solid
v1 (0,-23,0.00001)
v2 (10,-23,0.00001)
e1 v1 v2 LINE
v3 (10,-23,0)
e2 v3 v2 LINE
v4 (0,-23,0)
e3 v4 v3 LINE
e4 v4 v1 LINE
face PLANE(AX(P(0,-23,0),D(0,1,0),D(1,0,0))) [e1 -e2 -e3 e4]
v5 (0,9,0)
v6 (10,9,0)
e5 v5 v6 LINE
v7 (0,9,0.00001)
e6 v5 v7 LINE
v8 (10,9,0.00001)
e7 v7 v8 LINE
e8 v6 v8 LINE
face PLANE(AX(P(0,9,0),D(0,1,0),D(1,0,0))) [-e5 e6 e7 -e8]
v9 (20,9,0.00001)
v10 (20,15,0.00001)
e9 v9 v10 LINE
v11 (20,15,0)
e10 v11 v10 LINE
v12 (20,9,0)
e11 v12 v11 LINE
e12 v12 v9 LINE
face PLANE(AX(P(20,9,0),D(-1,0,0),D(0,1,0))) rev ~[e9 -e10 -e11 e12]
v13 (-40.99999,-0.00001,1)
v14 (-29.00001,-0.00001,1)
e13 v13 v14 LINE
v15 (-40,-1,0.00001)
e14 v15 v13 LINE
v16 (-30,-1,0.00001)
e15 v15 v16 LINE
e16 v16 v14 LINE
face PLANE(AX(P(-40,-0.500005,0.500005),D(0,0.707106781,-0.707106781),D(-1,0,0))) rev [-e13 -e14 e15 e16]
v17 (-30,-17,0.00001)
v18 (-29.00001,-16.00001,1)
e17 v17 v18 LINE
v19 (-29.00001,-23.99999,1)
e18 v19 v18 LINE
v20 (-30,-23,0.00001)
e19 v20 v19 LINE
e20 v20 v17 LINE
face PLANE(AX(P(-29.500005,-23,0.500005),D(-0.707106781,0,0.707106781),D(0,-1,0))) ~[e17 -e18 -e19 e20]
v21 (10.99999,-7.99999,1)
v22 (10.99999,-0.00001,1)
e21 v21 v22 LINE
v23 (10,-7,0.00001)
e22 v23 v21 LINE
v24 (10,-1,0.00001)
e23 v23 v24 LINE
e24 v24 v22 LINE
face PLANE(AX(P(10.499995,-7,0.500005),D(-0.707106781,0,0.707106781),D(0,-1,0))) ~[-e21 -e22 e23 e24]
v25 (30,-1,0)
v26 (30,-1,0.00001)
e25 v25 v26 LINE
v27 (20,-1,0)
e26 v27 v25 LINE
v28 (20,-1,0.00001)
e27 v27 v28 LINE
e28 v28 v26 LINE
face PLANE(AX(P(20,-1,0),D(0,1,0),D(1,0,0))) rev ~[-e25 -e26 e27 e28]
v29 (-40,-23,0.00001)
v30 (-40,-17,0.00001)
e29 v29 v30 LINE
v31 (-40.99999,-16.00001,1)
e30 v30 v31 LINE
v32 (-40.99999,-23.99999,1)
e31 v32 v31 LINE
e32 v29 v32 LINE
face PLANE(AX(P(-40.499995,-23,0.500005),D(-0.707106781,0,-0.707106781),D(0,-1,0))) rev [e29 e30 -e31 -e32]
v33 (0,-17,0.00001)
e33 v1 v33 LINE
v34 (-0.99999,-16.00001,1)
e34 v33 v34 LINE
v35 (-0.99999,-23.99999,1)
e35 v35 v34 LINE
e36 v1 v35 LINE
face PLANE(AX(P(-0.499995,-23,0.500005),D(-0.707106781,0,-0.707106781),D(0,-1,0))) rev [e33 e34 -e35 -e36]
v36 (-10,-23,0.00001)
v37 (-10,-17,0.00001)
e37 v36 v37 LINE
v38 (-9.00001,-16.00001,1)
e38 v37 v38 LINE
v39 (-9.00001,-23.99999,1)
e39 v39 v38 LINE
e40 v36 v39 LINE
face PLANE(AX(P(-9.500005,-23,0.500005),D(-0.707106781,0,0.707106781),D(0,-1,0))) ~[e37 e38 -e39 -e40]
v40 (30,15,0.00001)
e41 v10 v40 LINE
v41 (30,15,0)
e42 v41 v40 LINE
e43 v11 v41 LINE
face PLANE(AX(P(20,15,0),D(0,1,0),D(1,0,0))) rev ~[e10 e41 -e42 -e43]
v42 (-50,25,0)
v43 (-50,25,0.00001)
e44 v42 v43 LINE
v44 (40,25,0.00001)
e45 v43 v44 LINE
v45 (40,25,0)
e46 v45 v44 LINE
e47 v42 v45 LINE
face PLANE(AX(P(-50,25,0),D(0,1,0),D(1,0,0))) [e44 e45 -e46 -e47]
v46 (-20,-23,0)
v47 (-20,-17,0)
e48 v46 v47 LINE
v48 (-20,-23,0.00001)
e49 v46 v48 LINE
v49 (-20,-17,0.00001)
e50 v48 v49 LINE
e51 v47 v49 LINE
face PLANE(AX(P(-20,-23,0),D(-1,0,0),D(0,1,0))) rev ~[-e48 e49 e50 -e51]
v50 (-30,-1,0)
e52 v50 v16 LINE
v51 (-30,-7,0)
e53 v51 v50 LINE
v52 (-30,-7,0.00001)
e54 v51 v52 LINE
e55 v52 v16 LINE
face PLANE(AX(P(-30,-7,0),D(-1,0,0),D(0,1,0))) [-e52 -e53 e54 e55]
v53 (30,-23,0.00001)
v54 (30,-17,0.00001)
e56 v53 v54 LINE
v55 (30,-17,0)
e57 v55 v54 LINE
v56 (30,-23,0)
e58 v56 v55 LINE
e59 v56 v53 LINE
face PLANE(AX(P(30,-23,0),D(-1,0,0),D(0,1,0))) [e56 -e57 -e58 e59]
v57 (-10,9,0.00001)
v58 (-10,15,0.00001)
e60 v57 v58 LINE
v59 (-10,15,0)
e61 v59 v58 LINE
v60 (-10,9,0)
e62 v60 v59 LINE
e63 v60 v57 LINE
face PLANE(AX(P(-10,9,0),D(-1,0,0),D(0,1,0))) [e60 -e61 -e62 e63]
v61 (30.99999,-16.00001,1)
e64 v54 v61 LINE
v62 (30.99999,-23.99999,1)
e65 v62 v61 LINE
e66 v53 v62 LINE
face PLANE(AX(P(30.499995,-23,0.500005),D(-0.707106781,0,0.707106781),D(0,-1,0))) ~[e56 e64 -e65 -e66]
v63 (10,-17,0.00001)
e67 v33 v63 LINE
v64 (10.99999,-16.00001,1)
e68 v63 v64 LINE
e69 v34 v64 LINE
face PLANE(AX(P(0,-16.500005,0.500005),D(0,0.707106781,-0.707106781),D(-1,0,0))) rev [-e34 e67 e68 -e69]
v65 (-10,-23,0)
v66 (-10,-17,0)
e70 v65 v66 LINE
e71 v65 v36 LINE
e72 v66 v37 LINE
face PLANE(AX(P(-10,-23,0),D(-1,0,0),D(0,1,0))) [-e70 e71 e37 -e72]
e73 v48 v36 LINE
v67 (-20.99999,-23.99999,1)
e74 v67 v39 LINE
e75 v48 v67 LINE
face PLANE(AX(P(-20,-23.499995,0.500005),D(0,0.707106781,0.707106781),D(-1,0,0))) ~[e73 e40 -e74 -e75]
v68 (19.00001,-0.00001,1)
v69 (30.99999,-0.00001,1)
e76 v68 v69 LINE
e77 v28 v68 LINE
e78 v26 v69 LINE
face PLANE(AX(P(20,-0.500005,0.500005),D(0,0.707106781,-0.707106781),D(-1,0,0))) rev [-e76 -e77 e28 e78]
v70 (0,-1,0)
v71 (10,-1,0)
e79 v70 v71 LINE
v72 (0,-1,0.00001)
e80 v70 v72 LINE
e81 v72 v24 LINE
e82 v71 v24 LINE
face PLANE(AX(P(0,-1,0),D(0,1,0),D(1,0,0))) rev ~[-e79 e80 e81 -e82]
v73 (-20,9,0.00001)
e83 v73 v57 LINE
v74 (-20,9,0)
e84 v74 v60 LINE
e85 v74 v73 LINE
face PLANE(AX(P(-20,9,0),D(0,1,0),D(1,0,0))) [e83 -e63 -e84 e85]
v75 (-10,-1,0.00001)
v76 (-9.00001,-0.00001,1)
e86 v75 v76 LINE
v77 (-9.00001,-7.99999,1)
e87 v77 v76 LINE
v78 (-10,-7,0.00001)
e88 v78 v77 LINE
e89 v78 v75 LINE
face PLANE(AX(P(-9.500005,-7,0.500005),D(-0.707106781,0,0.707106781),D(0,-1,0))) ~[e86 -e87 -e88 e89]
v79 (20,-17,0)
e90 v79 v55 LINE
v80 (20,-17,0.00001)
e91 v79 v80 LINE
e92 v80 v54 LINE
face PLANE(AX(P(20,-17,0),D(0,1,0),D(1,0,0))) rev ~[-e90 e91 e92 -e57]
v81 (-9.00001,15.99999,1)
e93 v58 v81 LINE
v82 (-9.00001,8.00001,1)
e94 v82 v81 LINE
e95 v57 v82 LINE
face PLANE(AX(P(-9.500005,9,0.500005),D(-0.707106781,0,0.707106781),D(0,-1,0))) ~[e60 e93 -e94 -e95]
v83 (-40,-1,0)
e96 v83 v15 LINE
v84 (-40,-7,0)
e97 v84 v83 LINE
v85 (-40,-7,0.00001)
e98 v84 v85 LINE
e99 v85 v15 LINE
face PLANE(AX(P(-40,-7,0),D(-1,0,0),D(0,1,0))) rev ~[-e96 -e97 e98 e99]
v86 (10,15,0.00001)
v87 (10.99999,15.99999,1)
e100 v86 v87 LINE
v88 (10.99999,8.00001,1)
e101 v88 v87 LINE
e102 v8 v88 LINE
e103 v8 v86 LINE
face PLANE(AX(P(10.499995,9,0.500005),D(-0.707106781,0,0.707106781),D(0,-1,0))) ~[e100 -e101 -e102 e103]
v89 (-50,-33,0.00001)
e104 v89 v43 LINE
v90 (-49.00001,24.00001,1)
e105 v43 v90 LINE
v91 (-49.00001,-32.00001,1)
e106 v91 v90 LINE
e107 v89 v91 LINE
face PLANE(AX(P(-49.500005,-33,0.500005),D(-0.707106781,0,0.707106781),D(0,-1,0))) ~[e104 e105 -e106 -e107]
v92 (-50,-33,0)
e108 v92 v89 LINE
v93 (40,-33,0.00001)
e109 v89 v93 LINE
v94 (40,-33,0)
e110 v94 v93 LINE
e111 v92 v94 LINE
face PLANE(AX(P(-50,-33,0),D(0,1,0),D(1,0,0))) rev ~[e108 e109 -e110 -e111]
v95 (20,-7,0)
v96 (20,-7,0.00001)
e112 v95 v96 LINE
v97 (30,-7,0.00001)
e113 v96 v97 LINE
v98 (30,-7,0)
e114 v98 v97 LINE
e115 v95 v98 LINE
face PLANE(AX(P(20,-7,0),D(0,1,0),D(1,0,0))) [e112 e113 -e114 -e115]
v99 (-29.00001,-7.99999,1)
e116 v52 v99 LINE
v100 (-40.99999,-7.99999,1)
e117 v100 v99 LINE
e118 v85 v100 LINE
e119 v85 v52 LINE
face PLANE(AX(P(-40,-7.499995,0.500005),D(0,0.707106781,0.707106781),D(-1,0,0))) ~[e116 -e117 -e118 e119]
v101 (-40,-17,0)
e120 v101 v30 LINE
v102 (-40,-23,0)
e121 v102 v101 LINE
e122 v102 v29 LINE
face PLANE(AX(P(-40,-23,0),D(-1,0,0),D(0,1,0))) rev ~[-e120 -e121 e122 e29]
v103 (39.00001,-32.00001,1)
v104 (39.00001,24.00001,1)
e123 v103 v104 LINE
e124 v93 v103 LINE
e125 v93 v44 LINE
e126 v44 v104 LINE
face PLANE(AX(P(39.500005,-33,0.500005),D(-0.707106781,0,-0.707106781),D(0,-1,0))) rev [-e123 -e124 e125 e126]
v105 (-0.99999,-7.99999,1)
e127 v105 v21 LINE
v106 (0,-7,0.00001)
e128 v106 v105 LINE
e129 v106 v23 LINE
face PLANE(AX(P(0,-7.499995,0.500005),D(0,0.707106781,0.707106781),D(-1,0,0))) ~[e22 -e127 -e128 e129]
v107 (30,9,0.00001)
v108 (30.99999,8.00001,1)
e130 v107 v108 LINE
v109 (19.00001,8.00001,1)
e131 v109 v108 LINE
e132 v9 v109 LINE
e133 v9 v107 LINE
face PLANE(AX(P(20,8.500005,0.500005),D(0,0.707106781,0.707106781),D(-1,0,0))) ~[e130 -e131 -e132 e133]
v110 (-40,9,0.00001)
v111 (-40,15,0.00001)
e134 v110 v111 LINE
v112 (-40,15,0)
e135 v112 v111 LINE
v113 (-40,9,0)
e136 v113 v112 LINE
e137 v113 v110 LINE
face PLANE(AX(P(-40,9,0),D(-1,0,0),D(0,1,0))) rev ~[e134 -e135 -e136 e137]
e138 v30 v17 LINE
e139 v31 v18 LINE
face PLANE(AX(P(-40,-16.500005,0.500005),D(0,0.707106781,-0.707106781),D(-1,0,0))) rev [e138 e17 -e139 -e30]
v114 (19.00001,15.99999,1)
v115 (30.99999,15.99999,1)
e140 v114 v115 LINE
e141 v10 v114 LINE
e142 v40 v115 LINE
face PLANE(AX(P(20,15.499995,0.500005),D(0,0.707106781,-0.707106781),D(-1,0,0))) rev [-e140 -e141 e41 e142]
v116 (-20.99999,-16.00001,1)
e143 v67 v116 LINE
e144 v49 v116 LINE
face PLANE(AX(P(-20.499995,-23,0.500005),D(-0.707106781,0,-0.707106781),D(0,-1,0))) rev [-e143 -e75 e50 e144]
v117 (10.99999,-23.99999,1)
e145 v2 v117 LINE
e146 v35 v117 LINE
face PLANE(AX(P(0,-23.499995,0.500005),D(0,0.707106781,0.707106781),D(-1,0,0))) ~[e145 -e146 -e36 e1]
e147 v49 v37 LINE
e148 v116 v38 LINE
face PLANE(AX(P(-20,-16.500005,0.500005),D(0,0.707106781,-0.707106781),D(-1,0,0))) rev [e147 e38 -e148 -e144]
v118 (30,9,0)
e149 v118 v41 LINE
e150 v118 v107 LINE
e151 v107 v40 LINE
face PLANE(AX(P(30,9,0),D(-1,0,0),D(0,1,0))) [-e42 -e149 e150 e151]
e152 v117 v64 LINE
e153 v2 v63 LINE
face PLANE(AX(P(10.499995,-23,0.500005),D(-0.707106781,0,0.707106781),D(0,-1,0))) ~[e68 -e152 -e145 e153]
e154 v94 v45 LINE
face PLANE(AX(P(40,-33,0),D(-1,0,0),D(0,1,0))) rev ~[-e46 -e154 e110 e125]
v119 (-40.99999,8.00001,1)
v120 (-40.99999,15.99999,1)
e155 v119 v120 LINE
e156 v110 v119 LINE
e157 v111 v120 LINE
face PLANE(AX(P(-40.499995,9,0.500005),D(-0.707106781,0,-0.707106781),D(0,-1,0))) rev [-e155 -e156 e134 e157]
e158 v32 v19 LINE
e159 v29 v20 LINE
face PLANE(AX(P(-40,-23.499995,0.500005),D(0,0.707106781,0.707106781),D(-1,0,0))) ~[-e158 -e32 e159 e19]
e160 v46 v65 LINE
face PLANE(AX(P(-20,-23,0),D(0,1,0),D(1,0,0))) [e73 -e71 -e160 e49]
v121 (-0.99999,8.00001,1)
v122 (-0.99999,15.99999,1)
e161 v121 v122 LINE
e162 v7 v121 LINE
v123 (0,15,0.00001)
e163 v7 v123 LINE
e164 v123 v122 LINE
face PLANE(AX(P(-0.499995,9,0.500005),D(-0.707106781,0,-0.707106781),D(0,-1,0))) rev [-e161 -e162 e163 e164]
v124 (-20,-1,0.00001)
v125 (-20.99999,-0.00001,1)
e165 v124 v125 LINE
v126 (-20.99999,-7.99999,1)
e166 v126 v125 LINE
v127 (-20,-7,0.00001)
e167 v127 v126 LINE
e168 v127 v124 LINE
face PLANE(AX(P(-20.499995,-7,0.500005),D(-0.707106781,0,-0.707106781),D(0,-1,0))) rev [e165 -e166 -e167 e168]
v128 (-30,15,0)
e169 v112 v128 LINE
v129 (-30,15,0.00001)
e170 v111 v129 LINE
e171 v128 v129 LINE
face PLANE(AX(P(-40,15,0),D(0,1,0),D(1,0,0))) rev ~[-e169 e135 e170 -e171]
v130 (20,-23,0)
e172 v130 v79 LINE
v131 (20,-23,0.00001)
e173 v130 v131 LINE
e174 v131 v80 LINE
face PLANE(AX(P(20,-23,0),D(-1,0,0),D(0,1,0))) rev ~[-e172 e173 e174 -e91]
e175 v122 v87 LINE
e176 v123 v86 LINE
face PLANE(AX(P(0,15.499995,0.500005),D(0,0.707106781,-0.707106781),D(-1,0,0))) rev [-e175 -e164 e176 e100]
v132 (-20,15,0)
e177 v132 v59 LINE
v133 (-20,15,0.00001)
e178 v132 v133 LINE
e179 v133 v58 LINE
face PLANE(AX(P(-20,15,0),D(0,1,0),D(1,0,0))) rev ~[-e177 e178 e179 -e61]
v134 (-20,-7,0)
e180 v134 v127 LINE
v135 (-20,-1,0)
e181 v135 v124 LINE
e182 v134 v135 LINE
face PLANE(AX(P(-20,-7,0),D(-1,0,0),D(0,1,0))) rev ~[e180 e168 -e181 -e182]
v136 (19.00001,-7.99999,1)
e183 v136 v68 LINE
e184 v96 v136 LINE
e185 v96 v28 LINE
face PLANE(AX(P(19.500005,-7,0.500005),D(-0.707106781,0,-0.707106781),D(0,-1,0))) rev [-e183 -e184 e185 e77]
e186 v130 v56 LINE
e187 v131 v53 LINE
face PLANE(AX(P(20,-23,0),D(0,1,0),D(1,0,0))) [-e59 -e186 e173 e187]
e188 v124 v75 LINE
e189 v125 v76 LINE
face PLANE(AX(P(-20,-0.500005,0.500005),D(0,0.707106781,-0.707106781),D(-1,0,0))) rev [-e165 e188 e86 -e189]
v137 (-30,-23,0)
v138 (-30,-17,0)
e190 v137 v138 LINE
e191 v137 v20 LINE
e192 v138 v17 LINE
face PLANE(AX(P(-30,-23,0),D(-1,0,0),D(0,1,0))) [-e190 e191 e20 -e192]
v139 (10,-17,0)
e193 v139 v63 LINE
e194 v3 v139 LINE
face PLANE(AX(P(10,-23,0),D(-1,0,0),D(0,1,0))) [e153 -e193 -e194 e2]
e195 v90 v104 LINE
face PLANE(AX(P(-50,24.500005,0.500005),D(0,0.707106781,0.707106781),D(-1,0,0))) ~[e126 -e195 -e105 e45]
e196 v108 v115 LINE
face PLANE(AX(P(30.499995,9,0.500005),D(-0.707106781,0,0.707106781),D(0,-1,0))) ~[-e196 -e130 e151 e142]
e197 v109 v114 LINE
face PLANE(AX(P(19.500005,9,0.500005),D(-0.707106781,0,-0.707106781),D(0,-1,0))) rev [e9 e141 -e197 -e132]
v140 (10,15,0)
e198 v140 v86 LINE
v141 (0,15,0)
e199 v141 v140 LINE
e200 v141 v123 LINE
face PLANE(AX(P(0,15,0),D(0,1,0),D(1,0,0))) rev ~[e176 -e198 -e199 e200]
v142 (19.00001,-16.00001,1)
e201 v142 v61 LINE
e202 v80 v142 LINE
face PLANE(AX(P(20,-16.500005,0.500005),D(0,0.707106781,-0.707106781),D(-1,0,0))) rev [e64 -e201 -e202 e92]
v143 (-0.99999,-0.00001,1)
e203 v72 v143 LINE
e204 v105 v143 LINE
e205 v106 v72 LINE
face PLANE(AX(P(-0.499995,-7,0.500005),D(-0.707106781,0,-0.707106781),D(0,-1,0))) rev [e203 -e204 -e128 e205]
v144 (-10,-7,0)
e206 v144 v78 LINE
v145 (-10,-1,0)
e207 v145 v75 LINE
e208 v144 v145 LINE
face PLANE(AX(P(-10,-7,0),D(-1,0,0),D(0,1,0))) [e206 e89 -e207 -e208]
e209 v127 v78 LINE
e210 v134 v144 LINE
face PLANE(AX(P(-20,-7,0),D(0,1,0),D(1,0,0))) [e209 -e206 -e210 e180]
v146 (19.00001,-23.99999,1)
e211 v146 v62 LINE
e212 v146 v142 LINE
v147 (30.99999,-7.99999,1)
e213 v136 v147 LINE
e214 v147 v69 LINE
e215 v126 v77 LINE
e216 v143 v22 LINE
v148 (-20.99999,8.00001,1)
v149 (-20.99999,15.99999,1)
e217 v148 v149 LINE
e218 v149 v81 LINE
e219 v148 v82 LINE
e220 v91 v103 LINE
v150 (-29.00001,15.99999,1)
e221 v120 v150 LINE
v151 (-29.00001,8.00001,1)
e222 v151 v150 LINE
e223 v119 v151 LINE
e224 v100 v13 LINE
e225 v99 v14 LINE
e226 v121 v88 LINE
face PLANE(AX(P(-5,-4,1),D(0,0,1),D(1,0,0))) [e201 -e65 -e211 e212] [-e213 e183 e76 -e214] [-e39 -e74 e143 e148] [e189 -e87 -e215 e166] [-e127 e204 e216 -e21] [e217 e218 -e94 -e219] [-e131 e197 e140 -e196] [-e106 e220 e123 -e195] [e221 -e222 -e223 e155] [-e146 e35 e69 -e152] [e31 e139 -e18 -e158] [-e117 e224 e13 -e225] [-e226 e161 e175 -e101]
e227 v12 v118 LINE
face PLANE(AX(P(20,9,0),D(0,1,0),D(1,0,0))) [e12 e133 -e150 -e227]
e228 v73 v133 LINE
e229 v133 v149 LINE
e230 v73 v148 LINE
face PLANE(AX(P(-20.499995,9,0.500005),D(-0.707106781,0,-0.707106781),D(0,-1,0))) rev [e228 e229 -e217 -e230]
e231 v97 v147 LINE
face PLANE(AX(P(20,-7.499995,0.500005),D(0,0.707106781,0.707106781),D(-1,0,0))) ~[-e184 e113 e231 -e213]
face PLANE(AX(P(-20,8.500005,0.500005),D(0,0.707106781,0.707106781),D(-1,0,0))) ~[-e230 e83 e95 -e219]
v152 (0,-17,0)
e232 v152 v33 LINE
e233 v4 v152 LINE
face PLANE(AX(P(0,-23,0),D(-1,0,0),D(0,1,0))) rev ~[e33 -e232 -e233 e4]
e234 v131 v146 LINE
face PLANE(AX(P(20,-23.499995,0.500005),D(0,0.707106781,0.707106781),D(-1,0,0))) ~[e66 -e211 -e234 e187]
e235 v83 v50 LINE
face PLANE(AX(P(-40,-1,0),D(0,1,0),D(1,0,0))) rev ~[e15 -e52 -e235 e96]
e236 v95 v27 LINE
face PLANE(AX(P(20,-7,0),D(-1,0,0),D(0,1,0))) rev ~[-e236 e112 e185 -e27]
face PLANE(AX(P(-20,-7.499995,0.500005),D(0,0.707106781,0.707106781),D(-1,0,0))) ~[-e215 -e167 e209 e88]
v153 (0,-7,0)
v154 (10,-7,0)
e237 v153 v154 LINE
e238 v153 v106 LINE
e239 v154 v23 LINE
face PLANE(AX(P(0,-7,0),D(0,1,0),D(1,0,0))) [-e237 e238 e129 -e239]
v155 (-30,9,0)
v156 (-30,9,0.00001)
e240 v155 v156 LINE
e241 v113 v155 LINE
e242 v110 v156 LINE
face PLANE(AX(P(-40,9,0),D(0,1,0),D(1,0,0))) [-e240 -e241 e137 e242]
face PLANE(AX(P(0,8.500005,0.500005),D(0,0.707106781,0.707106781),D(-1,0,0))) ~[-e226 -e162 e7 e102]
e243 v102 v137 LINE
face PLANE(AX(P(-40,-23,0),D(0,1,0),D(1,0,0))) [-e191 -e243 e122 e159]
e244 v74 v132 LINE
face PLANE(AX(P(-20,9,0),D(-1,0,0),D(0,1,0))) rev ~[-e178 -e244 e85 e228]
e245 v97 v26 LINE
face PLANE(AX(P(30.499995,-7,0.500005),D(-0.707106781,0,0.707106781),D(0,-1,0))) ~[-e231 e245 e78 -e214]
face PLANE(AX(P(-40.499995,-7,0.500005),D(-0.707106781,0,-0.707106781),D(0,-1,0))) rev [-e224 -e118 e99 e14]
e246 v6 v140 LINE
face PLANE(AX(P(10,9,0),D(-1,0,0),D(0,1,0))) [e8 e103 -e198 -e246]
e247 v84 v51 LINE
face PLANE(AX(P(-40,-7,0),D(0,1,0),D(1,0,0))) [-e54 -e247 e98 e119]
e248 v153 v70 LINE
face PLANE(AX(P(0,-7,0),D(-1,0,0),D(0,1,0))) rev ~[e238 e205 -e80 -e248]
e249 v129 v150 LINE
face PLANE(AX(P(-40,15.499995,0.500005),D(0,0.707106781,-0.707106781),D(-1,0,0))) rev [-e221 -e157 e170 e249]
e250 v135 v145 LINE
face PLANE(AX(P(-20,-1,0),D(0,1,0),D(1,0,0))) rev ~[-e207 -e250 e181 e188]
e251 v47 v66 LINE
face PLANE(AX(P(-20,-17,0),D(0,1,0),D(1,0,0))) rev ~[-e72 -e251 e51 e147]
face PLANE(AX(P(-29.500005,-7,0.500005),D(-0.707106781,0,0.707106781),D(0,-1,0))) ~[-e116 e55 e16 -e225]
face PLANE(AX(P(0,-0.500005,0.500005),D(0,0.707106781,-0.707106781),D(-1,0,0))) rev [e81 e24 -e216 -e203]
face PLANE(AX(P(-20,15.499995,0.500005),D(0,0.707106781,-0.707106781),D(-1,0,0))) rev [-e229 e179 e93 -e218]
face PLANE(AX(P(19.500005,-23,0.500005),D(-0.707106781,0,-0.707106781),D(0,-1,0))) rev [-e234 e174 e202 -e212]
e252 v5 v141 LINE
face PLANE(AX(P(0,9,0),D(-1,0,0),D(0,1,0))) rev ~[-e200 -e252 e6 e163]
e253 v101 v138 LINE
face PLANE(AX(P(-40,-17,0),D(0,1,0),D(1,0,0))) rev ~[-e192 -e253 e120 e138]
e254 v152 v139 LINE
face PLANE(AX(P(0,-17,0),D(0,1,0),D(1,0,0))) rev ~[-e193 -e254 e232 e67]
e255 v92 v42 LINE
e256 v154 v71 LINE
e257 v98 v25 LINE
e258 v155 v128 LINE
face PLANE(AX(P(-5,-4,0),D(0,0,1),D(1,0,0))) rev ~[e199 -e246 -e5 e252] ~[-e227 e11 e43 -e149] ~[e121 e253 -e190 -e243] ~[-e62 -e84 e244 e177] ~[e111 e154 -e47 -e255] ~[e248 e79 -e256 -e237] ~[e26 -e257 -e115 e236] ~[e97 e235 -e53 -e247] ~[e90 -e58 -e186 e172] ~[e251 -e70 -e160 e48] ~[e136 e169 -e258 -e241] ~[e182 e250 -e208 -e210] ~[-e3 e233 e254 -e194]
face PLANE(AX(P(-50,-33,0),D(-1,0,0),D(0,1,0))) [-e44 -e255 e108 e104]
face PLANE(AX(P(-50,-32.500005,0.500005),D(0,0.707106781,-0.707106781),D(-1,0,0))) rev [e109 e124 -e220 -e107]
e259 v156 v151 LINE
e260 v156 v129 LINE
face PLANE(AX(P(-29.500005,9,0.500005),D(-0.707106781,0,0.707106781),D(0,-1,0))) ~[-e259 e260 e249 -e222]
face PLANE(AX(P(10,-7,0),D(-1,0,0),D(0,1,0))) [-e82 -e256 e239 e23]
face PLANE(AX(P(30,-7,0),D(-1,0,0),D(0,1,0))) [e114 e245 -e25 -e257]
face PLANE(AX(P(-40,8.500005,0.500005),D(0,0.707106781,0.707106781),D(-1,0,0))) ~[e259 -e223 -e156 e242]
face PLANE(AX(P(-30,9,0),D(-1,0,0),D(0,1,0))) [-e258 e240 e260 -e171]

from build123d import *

# Parameters (mm, degrees)
F0_W     = 90
F0_H     = 58
F0_W_2   = 10
F0_H_2   = 6
F1_DEPTH = 1
F2_SIZE  = 0.99999


# Not quite as in the source:
# - a fillet or chamfer is up to 0.001 mm smaller than in the source, because OpenCascade refuses the exact size


with BuildPart() as f1:
    # F0 (on Top) → F1 (new body)
    with BuildSketch(Plane.XY):
        with Locations((-5, -4)):
            Rectangle(F0_W, F0_H)
        with Locations((-35, -20)):
            Rectangle(F0_W_2, F0_H_2, mode=Mode.SUBTRACT)
        with Locations((-15, -20)):
            Rectangle(F0_W_2, F0_H_2, mode=Mode.SUBTRACT)
        with Locations((5, -20)):
            Rectangle(F0_W_2, F0_H_2, mode=Mode.SUBTRACT)
        with Locations((25, -20)):
            Rectangle(F0_W_2, F0_H_2, mode=Mode.SUBTRACT)
        with Locations((-35, -4)):
            Rectangle(F0_W_2, F0_H_2, mode=Mode.SUBTRACT)
        with Locations((-15, -4)):
            Rectangle(F0_W_2, F0_H_2, mode=Mode.SUBTRACT)
        with Locations((-35, 12)):
            Rectangle(F0_W_2, F0_H_2, mode=Mode.SUBTRACT)
        with Locations((-15, 12)):
            Rectangle(F0_W_2, F0_H_2, mode=Mode.SUBTRACT)
        with Locations((5, -4)):
            Rectangle(F0_W_2, F0_H_2, mode=Mode.SUBTRACT)
        with Locations((25, -4)):
            Rectangle(F0_W_2, F0_H_2, mode=Mode.SUBTRACT)
        with Locations((5, 12)):
            Rectangle(F0_W_2, F0_H_2, mode=Mode.SUBTRACT)
        with Locations((25, 12)):
            Rectangle(F0_W_2, F0_H_2, mode=Mode.SUBTRACT)
    extrude(amount=F1_DEPTH)

    # F2 (size 1 in the source; OpenCascade refuses exactly that, so slightly less here)
    f2_edges = [f1.edges().sort_by_distance(p)[0] for p in [
        (-35, 15, 1),
        (-40, 12, 1),
        (-35, 9, 1),
        (-30, 12, 1),
        (-30, -4, 1),
        (-35, -7, 1),
        (-35, -1, 1),
        (-40, -4, 1),
        (-35, -17, 1),
        (-40, -20, 1),
        (-35, -23, 1),
        (-30, -20, 1),
        (-5, 25, 1),
        (-50, -4, 1),
        (-5, -33, 1),
        (40, -4, 1),
        (-20, -20, 1),
        (-15, -17, 1),
        (-10, -20, 1),
        (-15, -23, 1),
        (5, -23, 1),
        (0, -20, 1),
        (5, -17, 1),
        (10, -20, 1),
        (25, -23, 1),
        (20, -20, 1),
        (25, -17, 1),
        (30, -20, 1),
        (-20, -4, 1),
        (-15, -1, 1),
        (-10, -4, 1),
        (-15, -7, 1),
        (-20, 12, 1),
        (-15, 15, 1),
        (-10, 12, 1),
        (-15, 9, 1),
        (5, -7, 1),
        (0, -4, 1),
        (5, -1, 1),
        (10, -4, 1),
        (25, -7, 1),
        (20, -4, 1),
        (25, -1, 1),
        (30, -4, 1),
        (0, 12, 1),
        (5, 15, 1),
        (10, 12, 1),
        (5, 9, 1),
        (25, 9, 1),
        (20, 12, 1),
        (25, 15, 1),
        (30, 12, 1),
    ]]
    chamfer(f2_edges, length=F2_SIZE)


solid = f1.part
